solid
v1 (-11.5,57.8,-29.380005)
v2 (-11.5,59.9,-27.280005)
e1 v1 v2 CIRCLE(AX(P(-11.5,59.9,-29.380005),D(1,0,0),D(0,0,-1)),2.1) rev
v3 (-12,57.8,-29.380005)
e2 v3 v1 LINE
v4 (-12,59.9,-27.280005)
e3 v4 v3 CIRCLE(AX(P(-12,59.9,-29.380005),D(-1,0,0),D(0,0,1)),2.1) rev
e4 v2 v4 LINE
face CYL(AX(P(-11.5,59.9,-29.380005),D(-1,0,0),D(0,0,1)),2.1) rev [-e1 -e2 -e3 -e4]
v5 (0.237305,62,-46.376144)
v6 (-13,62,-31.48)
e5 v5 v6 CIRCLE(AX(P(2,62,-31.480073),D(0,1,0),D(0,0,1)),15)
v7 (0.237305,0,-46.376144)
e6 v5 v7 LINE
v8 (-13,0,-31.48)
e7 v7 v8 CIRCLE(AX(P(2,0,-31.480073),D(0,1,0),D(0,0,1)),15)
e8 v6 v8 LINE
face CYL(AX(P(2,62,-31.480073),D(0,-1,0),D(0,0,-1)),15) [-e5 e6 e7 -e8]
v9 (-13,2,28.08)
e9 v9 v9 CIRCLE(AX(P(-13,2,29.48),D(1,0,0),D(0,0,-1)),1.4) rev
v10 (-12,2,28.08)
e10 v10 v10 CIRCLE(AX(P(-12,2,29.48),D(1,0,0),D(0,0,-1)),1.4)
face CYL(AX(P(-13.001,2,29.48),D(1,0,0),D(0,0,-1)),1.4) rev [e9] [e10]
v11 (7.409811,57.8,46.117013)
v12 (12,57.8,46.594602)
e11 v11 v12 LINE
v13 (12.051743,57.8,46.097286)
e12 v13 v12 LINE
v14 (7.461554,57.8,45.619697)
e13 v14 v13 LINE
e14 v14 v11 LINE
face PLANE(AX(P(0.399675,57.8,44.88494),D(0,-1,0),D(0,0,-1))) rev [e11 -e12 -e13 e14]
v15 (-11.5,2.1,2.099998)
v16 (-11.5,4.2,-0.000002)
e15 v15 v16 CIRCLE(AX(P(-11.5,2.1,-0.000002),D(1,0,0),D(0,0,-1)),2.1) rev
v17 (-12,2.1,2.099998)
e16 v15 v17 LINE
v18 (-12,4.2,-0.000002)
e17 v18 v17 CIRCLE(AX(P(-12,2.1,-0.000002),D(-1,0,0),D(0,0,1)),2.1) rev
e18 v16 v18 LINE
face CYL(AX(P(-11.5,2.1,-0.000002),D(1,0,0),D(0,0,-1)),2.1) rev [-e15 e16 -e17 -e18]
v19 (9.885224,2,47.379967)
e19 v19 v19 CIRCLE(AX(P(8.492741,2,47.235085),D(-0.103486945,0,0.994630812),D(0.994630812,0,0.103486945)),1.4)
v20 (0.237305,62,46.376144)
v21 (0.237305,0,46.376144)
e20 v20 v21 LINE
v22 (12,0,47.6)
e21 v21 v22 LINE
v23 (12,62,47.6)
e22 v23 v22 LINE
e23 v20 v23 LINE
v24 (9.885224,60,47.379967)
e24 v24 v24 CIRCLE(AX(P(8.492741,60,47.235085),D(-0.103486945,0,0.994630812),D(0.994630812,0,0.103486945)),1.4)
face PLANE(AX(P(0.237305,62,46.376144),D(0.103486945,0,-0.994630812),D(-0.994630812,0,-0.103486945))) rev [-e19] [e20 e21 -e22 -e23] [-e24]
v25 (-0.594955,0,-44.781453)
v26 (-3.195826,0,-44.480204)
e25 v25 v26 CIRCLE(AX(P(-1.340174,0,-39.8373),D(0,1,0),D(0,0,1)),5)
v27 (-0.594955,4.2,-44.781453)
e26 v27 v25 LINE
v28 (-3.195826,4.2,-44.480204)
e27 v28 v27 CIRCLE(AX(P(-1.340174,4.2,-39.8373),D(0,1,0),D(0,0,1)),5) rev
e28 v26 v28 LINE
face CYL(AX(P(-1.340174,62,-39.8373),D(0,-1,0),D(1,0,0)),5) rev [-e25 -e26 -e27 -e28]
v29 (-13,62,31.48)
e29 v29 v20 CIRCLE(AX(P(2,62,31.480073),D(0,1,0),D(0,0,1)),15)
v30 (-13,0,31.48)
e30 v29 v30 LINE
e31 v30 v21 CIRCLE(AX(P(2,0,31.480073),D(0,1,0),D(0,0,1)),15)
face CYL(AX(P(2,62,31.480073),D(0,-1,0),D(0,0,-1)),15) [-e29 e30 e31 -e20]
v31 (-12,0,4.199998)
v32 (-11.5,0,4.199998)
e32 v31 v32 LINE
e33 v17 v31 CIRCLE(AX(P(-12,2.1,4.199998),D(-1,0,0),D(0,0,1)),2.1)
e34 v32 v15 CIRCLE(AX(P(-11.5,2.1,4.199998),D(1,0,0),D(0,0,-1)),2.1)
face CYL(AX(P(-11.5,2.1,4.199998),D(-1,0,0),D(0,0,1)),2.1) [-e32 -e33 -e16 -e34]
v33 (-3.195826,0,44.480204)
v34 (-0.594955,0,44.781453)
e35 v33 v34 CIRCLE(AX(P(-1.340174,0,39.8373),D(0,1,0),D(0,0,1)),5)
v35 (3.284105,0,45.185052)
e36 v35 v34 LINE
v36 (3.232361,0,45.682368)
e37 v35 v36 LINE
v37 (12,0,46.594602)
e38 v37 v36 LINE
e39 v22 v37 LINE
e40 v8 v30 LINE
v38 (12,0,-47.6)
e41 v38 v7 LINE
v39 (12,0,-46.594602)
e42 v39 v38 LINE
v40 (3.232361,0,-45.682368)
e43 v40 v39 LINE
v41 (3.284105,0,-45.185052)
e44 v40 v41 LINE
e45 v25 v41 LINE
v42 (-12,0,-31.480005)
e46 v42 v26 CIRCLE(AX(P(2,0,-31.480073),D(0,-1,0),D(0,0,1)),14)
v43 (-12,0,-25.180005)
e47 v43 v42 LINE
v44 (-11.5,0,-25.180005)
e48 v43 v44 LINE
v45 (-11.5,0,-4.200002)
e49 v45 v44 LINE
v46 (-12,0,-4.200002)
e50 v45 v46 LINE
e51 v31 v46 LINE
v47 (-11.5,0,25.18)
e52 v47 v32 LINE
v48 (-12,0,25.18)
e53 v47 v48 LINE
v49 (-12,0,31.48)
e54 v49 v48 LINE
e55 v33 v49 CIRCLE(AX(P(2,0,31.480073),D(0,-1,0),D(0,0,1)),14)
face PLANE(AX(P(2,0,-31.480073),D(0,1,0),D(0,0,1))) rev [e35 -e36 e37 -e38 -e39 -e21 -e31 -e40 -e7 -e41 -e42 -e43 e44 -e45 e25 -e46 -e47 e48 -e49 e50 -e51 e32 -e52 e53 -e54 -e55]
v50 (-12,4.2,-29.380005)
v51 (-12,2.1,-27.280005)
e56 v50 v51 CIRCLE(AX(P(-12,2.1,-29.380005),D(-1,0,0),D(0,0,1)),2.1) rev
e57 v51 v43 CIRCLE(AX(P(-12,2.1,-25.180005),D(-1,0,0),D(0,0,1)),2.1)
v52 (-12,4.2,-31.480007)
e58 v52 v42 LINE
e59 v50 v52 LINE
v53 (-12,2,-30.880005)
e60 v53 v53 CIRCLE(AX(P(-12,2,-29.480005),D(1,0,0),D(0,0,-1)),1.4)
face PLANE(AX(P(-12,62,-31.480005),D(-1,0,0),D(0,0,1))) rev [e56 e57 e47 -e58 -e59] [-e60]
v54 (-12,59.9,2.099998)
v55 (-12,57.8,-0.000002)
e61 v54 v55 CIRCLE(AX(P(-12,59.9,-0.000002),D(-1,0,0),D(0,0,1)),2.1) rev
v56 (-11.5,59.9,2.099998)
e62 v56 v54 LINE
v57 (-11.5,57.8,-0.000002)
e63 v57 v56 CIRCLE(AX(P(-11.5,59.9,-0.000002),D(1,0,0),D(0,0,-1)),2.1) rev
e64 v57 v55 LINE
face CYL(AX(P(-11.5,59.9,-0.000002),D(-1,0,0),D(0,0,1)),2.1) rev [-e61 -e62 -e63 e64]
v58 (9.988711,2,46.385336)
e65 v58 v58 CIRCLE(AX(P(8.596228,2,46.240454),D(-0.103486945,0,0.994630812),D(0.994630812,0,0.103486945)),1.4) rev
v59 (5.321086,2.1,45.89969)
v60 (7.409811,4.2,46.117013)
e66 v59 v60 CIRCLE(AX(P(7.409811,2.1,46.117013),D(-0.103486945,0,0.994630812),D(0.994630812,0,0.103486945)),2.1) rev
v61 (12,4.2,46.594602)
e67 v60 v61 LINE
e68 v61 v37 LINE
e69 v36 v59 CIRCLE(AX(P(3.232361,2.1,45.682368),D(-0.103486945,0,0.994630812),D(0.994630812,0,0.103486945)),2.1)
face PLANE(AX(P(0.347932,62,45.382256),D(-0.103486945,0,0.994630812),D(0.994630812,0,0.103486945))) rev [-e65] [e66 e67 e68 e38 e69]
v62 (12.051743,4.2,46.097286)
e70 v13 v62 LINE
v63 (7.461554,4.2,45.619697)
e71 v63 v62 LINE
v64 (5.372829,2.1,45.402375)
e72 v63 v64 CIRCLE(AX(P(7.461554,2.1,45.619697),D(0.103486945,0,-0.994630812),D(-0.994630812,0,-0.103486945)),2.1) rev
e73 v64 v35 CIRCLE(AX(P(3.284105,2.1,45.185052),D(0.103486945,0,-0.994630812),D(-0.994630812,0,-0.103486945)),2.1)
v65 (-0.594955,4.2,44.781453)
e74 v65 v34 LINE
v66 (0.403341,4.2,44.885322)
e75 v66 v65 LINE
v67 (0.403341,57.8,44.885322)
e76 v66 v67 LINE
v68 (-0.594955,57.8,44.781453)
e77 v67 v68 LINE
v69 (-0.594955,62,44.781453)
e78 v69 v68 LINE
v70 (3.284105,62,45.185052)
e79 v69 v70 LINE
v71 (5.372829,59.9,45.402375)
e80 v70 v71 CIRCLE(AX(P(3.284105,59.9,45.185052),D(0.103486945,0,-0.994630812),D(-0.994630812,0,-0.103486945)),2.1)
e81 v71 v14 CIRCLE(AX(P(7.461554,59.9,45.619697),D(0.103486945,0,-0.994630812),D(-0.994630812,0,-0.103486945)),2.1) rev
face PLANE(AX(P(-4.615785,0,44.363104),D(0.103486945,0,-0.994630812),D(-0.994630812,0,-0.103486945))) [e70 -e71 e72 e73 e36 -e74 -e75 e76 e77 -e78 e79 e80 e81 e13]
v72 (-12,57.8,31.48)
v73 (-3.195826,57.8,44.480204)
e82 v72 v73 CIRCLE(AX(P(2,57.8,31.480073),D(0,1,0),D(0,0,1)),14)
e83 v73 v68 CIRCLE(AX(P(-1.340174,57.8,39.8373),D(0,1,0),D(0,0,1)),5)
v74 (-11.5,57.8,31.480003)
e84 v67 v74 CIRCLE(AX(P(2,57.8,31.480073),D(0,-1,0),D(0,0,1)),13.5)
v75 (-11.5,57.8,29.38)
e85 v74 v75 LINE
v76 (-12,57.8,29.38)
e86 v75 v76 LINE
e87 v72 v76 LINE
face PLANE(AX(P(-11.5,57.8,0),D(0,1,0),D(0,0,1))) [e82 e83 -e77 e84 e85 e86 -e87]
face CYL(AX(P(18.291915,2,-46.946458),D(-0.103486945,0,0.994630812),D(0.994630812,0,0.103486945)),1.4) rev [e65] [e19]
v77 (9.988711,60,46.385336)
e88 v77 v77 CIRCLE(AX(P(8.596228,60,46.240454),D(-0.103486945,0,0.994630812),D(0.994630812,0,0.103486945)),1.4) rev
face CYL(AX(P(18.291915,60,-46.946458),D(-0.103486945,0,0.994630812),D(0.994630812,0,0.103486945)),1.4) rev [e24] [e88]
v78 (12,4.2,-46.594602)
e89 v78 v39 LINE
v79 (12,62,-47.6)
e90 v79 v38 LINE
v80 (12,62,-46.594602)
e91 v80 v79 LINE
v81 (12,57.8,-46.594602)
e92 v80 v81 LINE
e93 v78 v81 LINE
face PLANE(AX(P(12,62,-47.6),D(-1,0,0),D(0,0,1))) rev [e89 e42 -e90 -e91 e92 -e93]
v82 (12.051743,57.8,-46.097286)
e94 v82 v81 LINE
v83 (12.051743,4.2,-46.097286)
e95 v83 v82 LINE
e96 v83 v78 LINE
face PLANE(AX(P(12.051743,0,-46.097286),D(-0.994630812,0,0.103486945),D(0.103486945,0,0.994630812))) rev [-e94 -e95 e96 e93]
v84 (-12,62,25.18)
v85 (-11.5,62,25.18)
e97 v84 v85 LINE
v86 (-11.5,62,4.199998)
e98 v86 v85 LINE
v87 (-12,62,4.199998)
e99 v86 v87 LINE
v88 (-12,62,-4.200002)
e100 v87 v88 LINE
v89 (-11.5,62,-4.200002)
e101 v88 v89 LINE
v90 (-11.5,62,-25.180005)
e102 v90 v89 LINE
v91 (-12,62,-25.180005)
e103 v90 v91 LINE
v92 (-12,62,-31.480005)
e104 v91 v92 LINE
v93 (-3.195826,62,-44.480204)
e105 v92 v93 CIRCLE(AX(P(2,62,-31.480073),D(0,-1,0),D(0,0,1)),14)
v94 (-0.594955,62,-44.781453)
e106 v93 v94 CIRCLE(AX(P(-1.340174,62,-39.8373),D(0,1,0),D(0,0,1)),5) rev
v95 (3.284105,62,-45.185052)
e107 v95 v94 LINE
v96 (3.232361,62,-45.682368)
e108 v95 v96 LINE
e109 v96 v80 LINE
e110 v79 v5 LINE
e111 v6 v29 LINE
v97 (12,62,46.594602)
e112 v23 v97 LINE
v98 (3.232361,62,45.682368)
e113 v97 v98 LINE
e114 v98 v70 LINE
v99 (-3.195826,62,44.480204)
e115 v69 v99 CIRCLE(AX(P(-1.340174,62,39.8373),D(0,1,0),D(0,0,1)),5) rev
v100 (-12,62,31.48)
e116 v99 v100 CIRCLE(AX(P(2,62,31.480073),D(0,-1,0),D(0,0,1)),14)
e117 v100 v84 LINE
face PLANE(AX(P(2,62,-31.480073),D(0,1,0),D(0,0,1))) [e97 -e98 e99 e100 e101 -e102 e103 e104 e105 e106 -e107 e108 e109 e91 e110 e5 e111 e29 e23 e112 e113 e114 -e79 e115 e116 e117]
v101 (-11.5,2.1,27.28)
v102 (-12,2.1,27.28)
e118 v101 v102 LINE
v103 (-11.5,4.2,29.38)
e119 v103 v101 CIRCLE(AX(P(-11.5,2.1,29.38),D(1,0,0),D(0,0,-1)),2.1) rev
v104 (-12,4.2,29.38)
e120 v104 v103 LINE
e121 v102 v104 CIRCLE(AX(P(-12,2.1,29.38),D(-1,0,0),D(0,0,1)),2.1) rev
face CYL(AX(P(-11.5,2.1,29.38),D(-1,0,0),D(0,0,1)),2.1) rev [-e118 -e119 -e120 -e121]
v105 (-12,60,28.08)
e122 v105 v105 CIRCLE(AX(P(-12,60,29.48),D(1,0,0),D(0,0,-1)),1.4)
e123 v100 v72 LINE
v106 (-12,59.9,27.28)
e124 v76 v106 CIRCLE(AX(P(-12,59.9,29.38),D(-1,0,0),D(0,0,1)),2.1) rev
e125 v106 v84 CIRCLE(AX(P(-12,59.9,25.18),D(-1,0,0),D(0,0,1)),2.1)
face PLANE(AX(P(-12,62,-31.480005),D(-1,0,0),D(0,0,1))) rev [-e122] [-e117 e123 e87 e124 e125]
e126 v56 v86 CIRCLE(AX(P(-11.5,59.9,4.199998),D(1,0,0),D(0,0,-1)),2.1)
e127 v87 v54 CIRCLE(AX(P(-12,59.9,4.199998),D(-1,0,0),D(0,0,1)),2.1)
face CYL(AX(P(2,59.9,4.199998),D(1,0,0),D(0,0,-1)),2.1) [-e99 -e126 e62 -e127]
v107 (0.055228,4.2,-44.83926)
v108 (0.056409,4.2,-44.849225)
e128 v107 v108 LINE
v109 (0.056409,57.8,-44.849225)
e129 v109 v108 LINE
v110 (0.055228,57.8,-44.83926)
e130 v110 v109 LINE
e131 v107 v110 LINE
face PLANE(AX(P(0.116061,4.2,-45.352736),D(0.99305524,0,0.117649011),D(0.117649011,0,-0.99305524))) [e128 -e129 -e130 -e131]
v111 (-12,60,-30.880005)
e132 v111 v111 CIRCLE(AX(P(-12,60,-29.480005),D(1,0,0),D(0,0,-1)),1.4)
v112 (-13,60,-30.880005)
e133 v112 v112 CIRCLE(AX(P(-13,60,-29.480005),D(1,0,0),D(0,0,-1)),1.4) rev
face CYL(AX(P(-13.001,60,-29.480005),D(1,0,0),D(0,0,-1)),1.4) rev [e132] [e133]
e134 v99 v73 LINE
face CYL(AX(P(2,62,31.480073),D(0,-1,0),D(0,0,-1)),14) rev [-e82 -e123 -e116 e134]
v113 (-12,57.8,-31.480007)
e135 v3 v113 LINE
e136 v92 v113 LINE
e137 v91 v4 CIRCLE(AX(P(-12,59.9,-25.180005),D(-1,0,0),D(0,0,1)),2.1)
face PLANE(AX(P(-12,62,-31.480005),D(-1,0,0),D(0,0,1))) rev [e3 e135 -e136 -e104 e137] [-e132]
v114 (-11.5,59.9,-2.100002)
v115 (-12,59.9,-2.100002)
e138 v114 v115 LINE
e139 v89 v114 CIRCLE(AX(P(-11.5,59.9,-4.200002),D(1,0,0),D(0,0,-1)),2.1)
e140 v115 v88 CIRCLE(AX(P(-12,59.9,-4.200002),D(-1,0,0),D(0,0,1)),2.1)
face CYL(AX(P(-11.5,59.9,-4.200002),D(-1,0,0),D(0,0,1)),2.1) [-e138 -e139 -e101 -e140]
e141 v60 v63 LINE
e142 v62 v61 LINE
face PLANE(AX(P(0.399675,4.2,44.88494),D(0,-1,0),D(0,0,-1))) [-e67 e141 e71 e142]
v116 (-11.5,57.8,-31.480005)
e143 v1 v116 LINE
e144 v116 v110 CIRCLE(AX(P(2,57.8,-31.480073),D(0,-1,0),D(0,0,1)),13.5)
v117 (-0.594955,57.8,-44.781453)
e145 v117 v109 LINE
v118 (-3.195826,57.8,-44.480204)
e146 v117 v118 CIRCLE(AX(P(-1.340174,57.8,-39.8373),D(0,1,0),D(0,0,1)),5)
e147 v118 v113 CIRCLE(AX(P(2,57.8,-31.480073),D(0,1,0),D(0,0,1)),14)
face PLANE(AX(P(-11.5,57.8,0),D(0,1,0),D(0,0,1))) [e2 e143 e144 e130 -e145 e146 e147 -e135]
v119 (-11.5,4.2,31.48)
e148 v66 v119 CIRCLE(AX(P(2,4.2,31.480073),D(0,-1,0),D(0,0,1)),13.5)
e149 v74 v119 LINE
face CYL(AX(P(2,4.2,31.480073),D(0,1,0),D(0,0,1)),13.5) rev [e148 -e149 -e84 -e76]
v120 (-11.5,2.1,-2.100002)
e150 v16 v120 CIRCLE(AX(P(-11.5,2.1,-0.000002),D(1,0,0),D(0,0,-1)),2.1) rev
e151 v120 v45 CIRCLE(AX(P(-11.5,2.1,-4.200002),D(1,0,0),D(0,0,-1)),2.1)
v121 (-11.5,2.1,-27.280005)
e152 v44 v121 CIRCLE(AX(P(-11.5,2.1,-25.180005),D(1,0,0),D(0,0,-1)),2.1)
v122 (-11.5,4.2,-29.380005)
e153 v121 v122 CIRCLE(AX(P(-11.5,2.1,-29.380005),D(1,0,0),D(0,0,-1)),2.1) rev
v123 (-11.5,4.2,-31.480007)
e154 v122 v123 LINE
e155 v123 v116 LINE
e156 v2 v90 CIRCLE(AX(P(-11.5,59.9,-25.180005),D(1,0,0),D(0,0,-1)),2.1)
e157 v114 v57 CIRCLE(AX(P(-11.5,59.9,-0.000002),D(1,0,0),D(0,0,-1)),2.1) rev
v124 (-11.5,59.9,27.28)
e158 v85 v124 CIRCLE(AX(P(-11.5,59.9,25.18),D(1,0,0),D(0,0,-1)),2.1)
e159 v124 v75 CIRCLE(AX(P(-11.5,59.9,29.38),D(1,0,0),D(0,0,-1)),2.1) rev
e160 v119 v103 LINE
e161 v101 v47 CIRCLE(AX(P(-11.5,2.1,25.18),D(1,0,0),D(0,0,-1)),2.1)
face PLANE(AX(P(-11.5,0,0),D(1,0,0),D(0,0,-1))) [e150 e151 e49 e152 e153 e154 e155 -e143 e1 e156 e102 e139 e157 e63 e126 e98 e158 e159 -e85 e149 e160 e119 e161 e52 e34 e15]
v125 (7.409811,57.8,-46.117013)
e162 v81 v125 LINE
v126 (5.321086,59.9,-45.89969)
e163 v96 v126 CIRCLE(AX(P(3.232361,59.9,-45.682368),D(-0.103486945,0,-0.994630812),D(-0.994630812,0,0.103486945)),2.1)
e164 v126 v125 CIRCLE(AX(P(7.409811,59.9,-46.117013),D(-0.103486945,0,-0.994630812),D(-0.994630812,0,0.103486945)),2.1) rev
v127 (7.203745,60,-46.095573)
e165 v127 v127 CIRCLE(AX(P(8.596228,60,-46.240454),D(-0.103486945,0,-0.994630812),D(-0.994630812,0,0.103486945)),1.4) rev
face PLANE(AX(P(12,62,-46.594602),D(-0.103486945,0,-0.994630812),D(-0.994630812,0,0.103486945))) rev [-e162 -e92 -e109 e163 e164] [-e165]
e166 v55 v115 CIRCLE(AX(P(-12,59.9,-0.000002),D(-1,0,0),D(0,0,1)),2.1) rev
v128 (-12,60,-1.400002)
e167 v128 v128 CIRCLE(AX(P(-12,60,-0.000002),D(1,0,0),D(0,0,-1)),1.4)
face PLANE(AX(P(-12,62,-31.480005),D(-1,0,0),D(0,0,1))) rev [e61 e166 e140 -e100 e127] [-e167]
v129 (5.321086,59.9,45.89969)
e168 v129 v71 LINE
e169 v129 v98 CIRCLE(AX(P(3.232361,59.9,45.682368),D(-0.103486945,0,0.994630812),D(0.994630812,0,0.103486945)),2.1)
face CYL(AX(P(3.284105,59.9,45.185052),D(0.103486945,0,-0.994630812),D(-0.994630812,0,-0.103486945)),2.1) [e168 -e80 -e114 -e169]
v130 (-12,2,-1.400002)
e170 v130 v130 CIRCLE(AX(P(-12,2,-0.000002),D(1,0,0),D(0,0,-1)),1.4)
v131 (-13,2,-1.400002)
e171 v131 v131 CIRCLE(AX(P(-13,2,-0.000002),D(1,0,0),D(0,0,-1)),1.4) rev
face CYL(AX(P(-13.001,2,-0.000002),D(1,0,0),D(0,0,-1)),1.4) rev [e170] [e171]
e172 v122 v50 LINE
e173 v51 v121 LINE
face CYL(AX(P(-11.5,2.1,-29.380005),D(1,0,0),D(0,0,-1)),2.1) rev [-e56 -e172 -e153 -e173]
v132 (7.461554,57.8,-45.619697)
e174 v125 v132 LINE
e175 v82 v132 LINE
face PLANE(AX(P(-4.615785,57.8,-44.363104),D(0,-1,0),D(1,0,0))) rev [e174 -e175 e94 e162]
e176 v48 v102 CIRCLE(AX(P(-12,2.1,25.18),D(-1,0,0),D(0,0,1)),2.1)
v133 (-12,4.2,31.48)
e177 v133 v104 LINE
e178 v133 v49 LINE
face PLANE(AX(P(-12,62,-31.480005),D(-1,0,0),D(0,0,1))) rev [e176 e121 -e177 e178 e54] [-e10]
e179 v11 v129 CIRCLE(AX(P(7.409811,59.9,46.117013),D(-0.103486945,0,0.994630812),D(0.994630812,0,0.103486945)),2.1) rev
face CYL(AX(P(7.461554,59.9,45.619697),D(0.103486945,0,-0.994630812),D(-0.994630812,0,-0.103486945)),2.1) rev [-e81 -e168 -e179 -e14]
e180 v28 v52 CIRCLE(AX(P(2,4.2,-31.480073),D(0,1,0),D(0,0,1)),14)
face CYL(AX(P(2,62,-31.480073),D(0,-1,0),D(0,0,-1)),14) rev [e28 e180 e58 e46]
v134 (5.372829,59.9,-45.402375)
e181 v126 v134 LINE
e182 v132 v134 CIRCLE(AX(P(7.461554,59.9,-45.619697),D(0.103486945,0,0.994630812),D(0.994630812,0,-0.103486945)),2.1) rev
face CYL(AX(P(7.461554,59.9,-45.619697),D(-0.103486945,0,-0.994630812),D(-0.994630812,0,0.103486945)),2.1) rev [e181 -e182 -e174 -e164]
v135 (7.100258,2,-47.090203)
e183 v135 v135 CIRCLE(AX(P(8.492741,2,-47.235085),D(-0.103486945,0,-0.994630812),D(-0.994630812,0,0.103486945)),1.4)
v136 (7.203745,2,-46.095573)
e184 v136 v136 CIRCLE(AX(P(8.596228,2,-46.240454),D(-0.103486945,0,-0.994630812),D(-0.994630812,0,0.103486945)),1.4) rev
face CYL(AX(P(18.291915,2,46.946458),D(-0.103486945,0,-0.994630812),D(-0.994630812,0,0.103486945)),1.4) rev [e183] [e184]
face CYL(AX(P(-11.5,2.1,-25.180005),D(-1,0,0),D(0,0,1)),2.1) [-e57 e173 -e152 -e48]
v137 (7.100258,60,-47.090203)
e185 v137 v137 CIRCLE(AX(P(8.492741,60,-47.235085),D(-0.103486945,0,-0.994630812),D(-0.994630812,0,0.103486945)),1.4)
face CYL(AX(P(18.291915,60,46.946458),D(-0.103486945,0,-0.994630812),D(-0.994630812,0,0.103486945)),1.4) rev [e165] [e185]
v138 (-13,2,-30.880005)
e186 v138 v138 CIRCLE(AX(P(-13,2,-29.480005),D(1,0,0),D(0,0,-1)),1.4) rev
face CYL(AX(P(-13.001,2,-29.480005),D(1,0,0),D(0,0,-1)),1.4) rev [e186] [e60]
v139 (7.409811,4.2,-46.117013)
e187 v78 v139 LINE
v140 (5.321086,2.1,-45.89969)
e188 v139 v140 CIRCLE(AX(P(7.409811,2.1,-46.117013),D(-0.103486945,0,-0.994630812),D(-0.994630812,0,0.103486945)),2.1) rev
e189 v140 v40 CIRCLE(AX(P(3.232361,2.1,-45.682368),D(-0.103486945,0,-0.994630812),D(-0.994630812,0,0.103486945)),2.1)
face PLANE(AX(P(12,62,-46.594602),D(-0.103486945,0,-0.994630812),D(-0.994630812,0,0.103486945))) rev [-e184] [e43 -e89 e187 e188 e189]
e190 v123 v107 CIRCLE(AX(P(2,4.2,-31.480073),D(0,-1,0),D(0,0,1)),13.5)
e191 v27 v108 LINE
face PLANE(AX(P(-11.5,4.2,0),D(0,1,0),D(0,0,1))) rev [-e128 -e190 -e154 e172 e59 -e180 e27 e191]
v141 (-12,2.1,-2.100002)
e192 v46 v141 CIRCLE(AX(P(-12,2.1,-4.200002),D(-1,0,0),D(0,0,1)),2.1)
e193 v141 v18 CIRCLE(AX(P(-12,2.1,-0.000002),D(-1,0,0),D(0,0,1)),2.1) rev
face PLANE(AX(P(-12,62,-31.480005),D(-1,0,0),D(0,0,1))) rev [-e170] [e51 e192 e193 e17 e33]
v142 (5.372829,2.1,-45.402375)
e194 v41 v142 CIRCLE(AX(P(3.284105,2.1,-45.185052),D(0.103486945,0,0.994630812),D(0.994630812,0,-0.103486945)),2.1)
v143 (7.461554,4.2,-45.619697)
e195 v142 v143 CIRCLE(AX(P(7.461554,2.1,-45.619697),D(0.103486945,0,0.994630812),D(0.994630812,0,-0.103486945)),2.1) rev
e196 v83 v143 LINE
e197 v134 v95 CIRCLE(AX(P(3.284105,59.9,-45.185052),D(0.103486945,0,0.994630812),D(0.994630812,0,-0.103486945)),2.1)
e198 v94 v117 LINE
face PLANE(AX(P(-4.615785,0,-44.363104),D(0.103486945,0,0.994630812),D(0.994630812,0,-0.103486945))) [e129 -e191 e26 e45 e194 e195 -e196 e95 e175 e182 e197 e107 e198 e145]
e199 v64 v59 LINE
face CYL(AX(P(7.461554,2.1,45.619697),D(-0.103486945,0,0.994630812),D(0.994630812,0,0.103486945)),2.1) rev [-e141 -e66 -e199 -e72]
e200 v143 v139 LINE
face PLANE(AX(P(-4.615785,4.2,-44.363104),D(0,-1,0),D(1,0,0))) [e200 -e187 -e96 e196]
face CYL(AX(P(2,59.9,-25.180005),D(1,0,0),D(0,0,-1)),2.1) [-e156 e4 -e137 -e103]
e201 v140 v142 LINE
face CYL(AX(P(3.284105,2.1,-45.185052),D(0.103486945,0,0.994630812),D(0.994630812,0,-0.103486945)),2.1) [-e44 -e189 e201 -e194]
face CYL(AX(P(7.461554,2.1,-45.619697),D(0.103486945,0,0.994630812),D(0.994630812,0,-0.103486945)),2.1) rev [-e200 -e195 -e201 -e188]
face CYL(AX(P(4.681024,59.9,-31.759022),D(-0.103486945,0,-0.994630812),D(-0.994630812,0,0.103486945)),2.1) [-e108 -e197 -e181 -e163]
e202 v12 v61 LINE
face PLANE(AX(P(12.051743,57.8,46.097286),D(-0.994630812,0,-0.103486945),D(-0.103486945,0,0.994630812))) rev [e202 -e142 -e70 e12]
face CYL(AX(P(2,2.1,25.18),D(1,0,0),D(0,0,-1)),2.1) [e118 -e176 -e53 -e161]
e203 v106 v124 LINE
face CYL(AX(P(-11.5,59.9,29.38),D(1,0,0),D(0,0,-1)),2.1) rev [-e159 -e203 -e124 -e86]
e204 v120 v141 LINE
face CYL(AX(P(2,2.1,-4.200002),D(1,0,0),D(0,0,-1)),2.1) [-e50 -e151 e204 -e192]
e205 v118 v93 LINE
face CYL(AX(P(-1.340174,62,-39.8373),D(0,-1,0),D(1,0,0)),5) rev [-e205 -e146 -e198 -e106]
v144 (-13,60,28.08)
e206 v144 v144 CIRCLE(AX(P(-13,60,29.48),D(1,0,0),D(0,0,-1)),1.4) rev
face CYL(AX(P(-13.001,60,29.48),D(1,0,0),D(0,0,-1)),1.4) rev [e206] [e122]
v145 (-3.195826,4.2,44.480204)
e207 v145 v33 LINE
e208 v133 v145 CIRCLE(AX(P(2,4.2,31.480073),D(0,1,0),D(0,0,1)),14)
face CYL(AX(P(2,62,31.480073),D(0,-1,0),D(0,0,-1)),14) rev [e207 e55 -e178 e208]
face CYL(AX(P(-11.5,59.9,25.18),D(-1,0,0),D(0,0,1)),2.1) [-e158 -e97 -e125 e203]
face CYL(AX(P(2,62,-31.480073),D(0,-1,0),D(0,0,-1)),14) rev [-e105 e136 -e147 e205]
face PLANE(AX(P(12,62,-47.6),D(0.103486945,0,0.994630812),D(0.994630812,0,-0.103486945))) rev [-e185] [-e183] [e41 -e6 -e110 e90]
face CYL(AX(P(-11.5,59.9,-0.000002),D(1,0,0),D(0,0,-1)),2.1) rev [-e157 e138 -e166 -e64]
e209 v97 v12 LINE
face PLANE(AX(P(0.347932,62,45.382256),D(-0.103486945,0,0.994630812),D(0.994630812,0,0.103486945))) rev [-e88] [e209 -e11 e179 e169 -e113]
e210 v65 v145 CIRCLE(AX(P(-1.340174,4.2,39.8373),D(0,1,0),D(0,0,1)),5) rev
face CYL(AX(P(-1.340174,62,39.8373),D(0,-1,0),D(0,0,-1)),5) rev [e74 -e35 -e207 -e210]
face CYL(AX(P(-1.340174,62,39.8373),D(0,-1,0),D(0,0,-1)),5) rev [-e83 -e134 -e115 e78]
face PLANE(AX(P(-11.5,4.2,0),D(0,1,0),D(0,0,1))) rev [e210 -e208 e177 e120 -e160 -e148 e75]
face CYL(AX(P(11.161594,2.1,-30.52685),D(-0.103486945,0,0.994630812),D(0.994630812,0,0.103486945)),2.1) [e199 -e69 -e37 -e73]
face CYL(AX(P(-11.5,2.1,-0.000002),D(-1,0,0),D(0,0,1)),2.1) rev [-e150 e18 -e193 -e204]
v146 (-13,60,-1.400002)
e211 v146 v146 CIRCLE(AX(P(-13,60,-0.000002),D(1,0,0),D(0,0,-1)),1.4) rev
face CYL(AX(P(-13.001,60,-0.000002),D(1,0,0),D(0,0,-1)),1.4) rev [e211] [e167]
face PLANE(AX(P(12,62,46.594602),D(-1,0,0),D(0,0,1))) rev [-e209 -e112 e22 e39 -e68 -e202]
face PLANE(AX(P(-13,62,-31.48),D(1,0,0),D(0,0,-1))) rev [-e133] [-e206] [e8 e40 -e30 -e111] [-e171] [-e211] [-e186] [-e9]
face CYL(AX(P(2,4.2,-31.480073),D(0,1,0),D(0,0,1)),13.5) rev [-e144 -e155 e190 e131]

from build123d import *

# Parameters (mm, degrees)
EXTRUDE_1_DEPTH     = 62
CUT_EXTRUDE_1_REACH = 83.766
SKETCH_3_R          = 1.4
CUT_EXTRUDE_2_REACH = 115.398
SKETCH_4_R          = 1.4
CUT_EXTRUDE_3_REACH = 115.398
SKETCH_5_R          = 1.4
SKETCH_6_W          = 25.180002444
SKETCH_6_H          = 4.2
SKETCH_6_H_2        = 53.6
SKETCH_6_W_2        = 25.180002445
SKETCH_6_W_3        = 4.2
EXTRUDE_2_DEPTH     = 0.5
EXTRUDE_START       = -53.6
EXTRUDE_8_DEPTH     = 53.6
SKETCH_8_W          = 6
SKETCH_8_H          = 62
SKETCH_8_W_2        = 11.714967937
SKETCH_8_H_2        = 53.6
EXTRUDE_9_DEPTH     = 0.5
EXTRUDE_10_DEPTH    = 0.5
FILLET_START        = -45.102583308
FILLET_1_DEPTH      = 0.5
FILLET_START_2      = -12.000000001
FILLET_1_2_DEPTH    = 0.5
FILLET_1_3_DEPTH    = 0.5
FILLET_1_4_DEPTH    = 1.102583308
FILLET_1_5_DEPTH    = 12.05640865
FILLET_1_6_DEPTH    = 1.102583308
FILLET_2_R          = 5


with BuildPart() as part:
    # 스케치1 → 보스-돌출1 (new body)
    with BuildSketch(Plane(origin=(0, 0, 0), x_dir=(1, 0, 0), z_dir=(0, 1, 0))):
        with BuildLine():
            Line((12, 47.6), (0.237305416, 46.376143554))
            ThreePointArc((0.237305416, 46.376143554), (-9.212526729, 41.443970389), (-13.000000001, 31.48))
            Line((-13.000000001, 31.48), (-13.000000001, -31.48))
            ThreePointArc((-13.000000001, -31.48), (-9.212526729, -41.443970389), (0.237305416, -46.376143554))
            Line((0.237305416, -46.376143554), (12, -47.6))
            Line((12, -47.6), (12, -46.594601828))
            Line((12, -46.594601828), (0.347931928, -45.382255583))
            ThreePointArc((0.347931928, -45.382255583), (-8.467329474, -40.777116618), (-12.000000001, -31.48))
            Line((-12.000000001, -31.48), (-12.000000001, 31.480004889))
            ThreePointArc((-12.000000001, 31.480004889), (-8.46732785, 40.777118446), (0.347931928, 45.382255583))
            Line((0.347931928, 45.382255583), (12, 46.594601828))
            Line((12, 46.594601828), (12, 47.6))
        make_face()
    extrude(amount=EXTRUDE_1_DEPTH)

    # 스케치3 → 컷-돌출1 (cut, up to next)
    with BuildSketch(Plane(origin=(-12.000000001, 0, 0), x_dir=(0, 0, -1), z_dir=(1, 0, 0)), mode=Mode.PRIVATE) as cut_extrude_1_sk1:
        with Locations((-29.48, 60)):
            Circle(SKETCH_3_R)
    cut_extrude_1_tool1 = extrude(cut_extrude_1_sk1.sketch, amount=-CUT_EXTRUDE_1_REACH, mode=Mode.PRIVATE) & part.part
    # 스케치3 → 컷-돌출1 (cut, up to next)
    with BuildSketch(Plane(origin=(-12.000000001, 0, 0), x_dir=(0, 0, -1), z_dir=(1, 0, 0)), mode=Mode.PRIVATE) as cut_extrude_1_sk2:
        with Locations((29.480004889, 60)):
            Circle(SKETCH_3_R)
    cut_extrude_1_tool2 = extrude(cut_extrude_1_sk2.sketch, amount=-CUT_EXTRUDE_1_REACH, mode=Mode.PRIVATE) & part.part
    # 스케치3 → 컷-돌출1 (cut, up to next)
    with BuildSketch(Plane(origin=(-12.000000001, 0, 0), x_dir=(0, 0, -1), z_dir=(1, 0, 0)), mode=Mode.PRIVATE) as cut_extrude_1_sk3:
        with Locations((-29.48, 2)):
            Circle(SKETCH_3_R)
    cut_extrude_1_tool3 = extrude(cut_extrude_1_sk3.sketch, amount=-CUT_EXTRUDE_1_REACH, mode=Mode.PRIVATE) & part.part
    # 스케치3 → 컷-돌출1 (cut, up to next)
    with BuildSketch(Plane(origin=(-12.000000001, 0, 0), x_dir=(0, 0, -1), z_dir=(1, 0, 0)), mode=Mode.PRIVATE) as cut_extrude_1_sk4:
        with Locations((29.480004889, 2)):
            Circle(SKETCH_3_R)
    cut_extrude_1_tool4 = extrude(cut_extrude_1_sk4.sketch, amount=-CUT_EXTRUDE_1_REACH, mode=Mode.PRIVATE) & part.part
    # 스케치3 → 컷-돌출1 (cut, up to next)
    with BuildSketch(Plane(origin=(-12.000000001, 0, 0), x_dir=(0, 0, -1), z_dir=(1, 0, 0)), mode=Mode.PRIVATE) as cut_extrude_1_sk5:
        with Locations((2.445e-06, 2)):
            Circle(SKETCH_3_R)
    cut_extrude_1_tool5 = extrude(cut_extrude_1_sk5.sketch, amount=-CUT_EXTRUDE_1_REACH, mode=Mode.PRIVATE) & part.part
    # 스케치3 → 컷-돌출1 (cut, up to next)
    with BuildSketch(Plane(origin=(-12.000000001, 0, 0), x_dir=(0, 0, -1), z_dir=(1, 0, 0)), mode=Mode.PRIVATE) as cut_extrude_1_sk6:
        with Locations((2.445e-06, 60)):
            Circle(SKETCH_3_R)
    cut_extrude_1_tool6 = extrude(cut_extrude_1_sk6.sketch, amount=-CUT_EXTRUDE_1_REACH, mode=Mode.PRIVATE) & part.part
    add(cut_extrude_1_tool1.solids().sort_by_distance((-12, 60, 29.48))[0], mode=Mode.SUBTRACT)
    add(cut_extrude_1_tool2.solids().sort_by_distance((-12, 60, -29.480005))[0], mode=Mode.SUBTRACT)
    add(cut_extrude_1_tool3.solids().sort_by_distance((-12, 2, 29.48))[0], mode=Mode.SUBTRACT)
    add(cut_extrude_1_tool4.solids().sort_by_distance((-12, 2, -29.480005))[0], mode=Mode.SUBTRACT)
    add(cut_extrude_1_tool5.solids().sort_by_distance((-12, 2, -2e-06))[0], mode=Mode.SUBTRACT)
    add(cut_extrude_1_tool6.solids().sort_by_distance((-12, 60, -2e-06))[0], mode=Mode.SUBTRACT)

    # 스케치4 → 컷-돌출2 (cut, up to next)
    with BuildSketch(Plane(origin=(-4.771015515, 0, 45.85504987), x_dir=(0.9946308119914395, 0, 0.10348694525035429), z_dir=(-0.10348694525035429, 0, 0.9946308119914395)), mode=Mode.PRIVATE) as cut_extrude_2_sk1:
        with Locations((13.335356707, 60)):
            Circle(SKETCH_4_R)
    cut_extrude_2_tool1 = extrude(cut_extrude_2_sk1.sketch, amount=-CUT_EXTRUDE_2_REACH, mode=Mode.PRIVATE) & part.part
    # 스케치4 → 컷-돌출2 (cut, up to next)
    with BuildSketch(Plane(origin=(-4.771015515, 0, 45.85504987), x_dir=(0.9946308119914395, 0, 0.10348694525035429), z_dir=(-0.10348694525035429, 0, 0.9946308119914395)), mode=Mode.PRIVATE) as cut_extrude_2_sk2:
        with Locations((13.335356707, 2)):
            Circle(SKETCH_4_R)
    cut_extrude_2_tool2 = extrude(cut_extrude_2_sk2.sketch, amount=-CUT_EXTRUDE_2_REACH, mode=Mode.PRIVATE) & part.part
    add(cut_extrude_2_tool1.solids().sort_by_distance((8.492741, 60, 47.235085))[0], mode=Mode.SUBTRACT)
    add(cut_extrude_2_tool2.solids().sort_by_distance((8.492741, 2, 47.235085))[0], mode=Mode.SUBTRACT)

    # 스케치5 → 컷-돌출3 (cut, up to next)
    with BuildSketch(Plane(origin=(-4.771015515, 0, -45.85504987), x_dir=(-0.9946308119914237, 0, 0.10348694525050525), z_dir=(-0.10348694525050527, 0, -0.9946308119914238)), mode=Mode.PRIVATE) as cut_extrude_3_sk1:
        with Locations((-13.335356707, 60)):
            Circle(SKETCH_5_R)
    cut_extrude_3_tool1 = extrude(cut_extrude_3_sk1.sketch, amount=-CUT_EXTRUDE_3_REACH, mode=Mode.PRIVATE) & part.part
    # 스케치5 → 컷-돌출3 (cut, up to next)
    with BuildSketch(Plane(origin=(-4.771015515, 0, -45.85504987), x_dir=(-0.9946308119914237, 0, 0.10348694525050525), z_dir=(-0.10348694525050527, 0, -0.9946308119914238)), mode=Mode.PRIVATE) as cut_extrude_3_sk2:
        with Locations((-13.335356707, 2)):
            Circle(SKETCH_5_R)
    cut_extrude_3_tool2 = extrude(cut_extrude_3_sk2.sketch, amount=-CUT_EXTRUDE_3_REACH, mode=Mode.PRIVATE) & part.part
    add(cut_extrude_3_tool1.solids().sort_by_distance((8.492741, 60, -47.235085))[0], mode=Mode.SUBTRACT)
    add(cut_extrude_3_tool2.solids().sort_by_distance((8.492741, 2, -47.235085))[0], mode=Mode.SUBTRACT)

    # 스케치6 → 보스-돌출2 (add)
    with BuildSketch(Plane(origin=(-12.000000001, 0, 0), x_dir=(0, 0, -1), z_dir=(1, 0, 0))):
        with Locations((14.690003667, 59.9)):
            Rectangle(SKETCH_6_W, SKETCH_6_H)
        with Locations((14.690003667, 31)):
            Rectangle(SKETCH_6_W, SKETCH_6_H_2)
        with Locations((14.690003667, 2.1)):
            Rectangle(SKETCH_6_W, SKETCH_6_H)
        with Locations((-14.689998778, 59.9)):
            Rectangle(SKETCH_6_W_2, SKETCH_6_H)
        with Locations((-14.689998778, 2.1)):
            Rectangle(SKETCH_6_W_2, SKETCH_6_H)
        with Locations((-29.38, 31)):
            Rectangle(SKETCH_6_W_3, SKETCH_6_H_2)
        with Locations((29.380004889, 31)):
            Rectangle(SKETCH_6_W_3, SKETCH_6_H_2)
        with Locations((-14.689998778, 31)):
            Rectangle(SKETCH_6_W_2, SKETCH_6_H_2)
        with Locations((2.445e-06, 31)):
            Rectangle(SKETCH_6_W_3, SKETCH_6_H_2)
    extrude(amount=EXTRUDE_2_DEPTH)

    # 보스-돌출8: read off the stored shape, not the designer's step
    # 보스-돌출8 outline → 보스-돌출8 (add)
    with BuildSketch(Plane(origin=(0, 57.8, 0), x_dir=(1, 0, 0), z_dir=(0, 1, 0)).offset(EXTRUDE_START)):
        with BuildLine():
            ThreePointArc((-11.500000001, 31.480004889), (-8.210419566, 40.311683176), (0.055228076, 44.839259774))
            Line((0.055228076, 44.839259774), (0.116060525, 45.352736101))
            ThreePointArc((0.116060525, 45.352736101), (-8.544574488, 40.689413647), (-12.000000001, 31.480004889))
            Line((-12.000000001, 31.480004889), (-11.500000001, 31.480004889))
        make_face()
        with BuildLine():
            ThreePointArc((0.406934359, -44.885749074), (-8.093497148, -40.445078379), (-11.500000001, -31.48))
            Line((-11.500000001, -31.48), (-12.000000001, -31.48))
            ThreePointArc((-12.000000001, -31.48), (-8.467329474, -40.777116618), (0.347931928, -45.382255583))
            Line((0.347931928, -45.382255583), (0.406934359, -44.885749074))
        make_face()
    extrude(amount=EXTRUDE_8_DEPTH)

    # 스케치8 → 보스-돌출9 (add)
    with BuildSketch(Plane(origin=(-4.667528569, 0, 44.860419058), x_dir=(-0.9946308119914395, 0, -0.10348694525035321), z_dir=(0.10348694525035321, 0, -0.9946308119914395))):
        with Locations((-7.042534815, 31)):
            Rectangle(SKETCH_8_W, SKETCH_8_H)
        with Locations((-10.900018784, 31)):
            Rectangle(SKETCH_8_W_2, SKETCH_8_H_2)
    extrude(amount=EXTRUDE_9_DEPTH)

    # 스케치9 → 보스-돌출10 (add)
    with BuildSketch(Plane(origin=(-4.667528569, 0, -44.860419058), x_dir=(0.9946308119914264, 0, -0.10348694525048052), z_dir=(0.10348694525048052, 0, 0.9946308119914264))):
        Polygon((16.757502752, 4.2), (16.757502752, 57.8), (10.042534815, 57.8), (10.042534815, 62), (4.042534815, 62), (4.042534815, 0), (10.042534815, 0), (10.042534815, 4.2), align=None)
    extrude(amount=EXTRUDE_10_DEPTH)

    # 필렛1: read off the stored shape, not the designer's step
    # 필렛1 outline → 필렛1 (add)
    with BuildSketch(Plane(origin=(0, 0, 0), x_dir=(0.9946308119914397, 0, 0.10348694525035299), z_dir=(0.10348694525035297, 0, -0.9946308119914397)).offset(FILLET_START)):
        with BuildLine():
            ThreePointArc((10.042534815, -59.9), (10.657610575, -58.415075759), (12.142534815, -57.8))
            Line((12.142534815, -57.8), (10.042534815, -57.8))
            Line((10.042534815, -57.8), (10.042534815, -59.9))
        make_face()
        with BuildLine():
            Line((10.042534815, -4.2), (12.142534815, -4.2))
            ThreePointArc((12.142534815, -4.2), (10.657610574, -3.58492424), (10.042534815, -2.1))
            Line((10.042534815, -2.1), (10.042534815, -4.2))
        make_face()
    extrude(amount=FILLET_1_DEPTH)

    # Fillet 1 2 outline → Fillet 1 2 (add)
    with BuildSketch(Plane.YZ.offset(FILLET_START_2)):
        with BuildLine():
            Line((4.2, 27.28), (4.2, 29.38))
            ThreePointArc((4.2, 29.38), (3.58492424, 27.89507576), (2.1, 27.28))
            Line((2.1, 27.28), (4.2, 27.28))
        make_face()
        with BuildLine():
            Line((4.2, -27.280004889), (2.1, -27.280004889))
            ThreePointArc((2.1, -27.280004889), (3.58492424, -27.895080649), (4.2, -29.380004889))
            Line((4.2, -29.380004889), (4.2, -27.280004889))
        make_face()
        with BuildLine():
            Line((4.2, 2.099997555), (2.1, 2.099997555))
            ThreePointArc((2.1, 2.099997555), (3.584924241, 1.484921796), (4.2, -2.445e-06))
            Line((4.2, -2.445e-06), (4.2, 2.099997555))
        make_face()
        with BuildLine():
            Line((4.2, -2.100002445), (4.2, -2.445e-06))
            ThreePointArc((4.2, -2.445e-06), (3.58492424, -1.484926685), (2.1, -2.100002445))
            Line((2.1, -2.100002445), (4.2, -2.100002445))
        make_face()
        with BuildLine():
            Line((57.8, -27.280004889), (57.8, -29.380004889))
            ThreePointArc((57.8, -29.380004889), (58.41507576, -27.895080649), (59.9, -27.280004889))
            Line((59.9, -27.280004889), (57.8, -27.280004889))
        make_face()
        with BuildLine():
            Line((57.8, 27.28), (59.9, 27.28))
            ThreePointArc((59.9, 27.28), (58.41507576, 27.89507576), (57.8, 29.38))
            Line((57.8, 29.38), (57.8, 27.28))
        make_face()
        with BuildLine():
            Line((57.8, -2.100002445), (59.9, -2.100002445))
            ThreePointArc((59.9, -2.100002445), (58.41507576, -1.484926685), (57.8, -2.445e-06))
            Line((57.8, -2.445e-06), (57.8, -2.100002445))
        make_face()
        with BuildLine():
            Line((57.8, 2.099997555), (57.8, -2.445e-06))
            ThreePointArc((57.8, -2.445e-06), (58.415075759, 1.484921795), (59.9, 2.099997555))
            Line((59.9, 2.099997555), (57.8, 2.099997555))
        make_face()
    extrude(amount=FILLET_1_2_DEPTH)

    # Fillet 1 3 outline → Fillet 1 3 (add)
    with BuildSketch(Plane(origin=(0, 0, 0), x_dir=(0.9946308119914263, 0, -0.10348694525048104), z_dir=(0.10348694525048102, 0, 0.9946308119914263)).offset(FILLET_START)):
        with BuildLine():
            ThreePointArc((10.042534815, 2.1), (10.657610574, 3.58492424), (12.142534815, 4.2))
            Line((12.142534815, 4.2), (10.042534815, 4.2))
            Line((10.042534815, 4.2), (10.042534815, 2.1))
        make_face()
        with BuildLine():
            ThreePointArc((12.142534815, 57.8), (10.657610575, 58.415075759), (10.042534815, 59.9))
            Line((10.042534815, 59.9), (10.042534815, 57.8))
            Line((10.042534815, 57.8), (12.142534815, 57.8))
        make_face()
    extrude(amount=FILLET_1_3_DEPTH)

    # Fillet 1 4 outline → Fillet 1 4 (cut)
    with BuildSketch(Plane(origin=(0, 0, 0), x_dir=(0.9946308119914397, 0, 0.10348694525035299), z_dir=(0.10348694525035297, 0, -0.9946308119914397)).offset(FILLET_START)):
        with BuildLine():
            Line((10.042534815, -62), (10.042534815, -59.9))
            ThreePointArc((10.042534815, -59.9), (9.427459055, -61.38492424), (7.942534815, -62))
            Line((7.942534815, -62), (10.042534815, -62))
        make_face()
        with BuildLine():
            ThreePointArc((7.942534815, 0), (9.427459055, -0.61507576), (10.042534815, -2.1))
            Line((10.042534815, -2.1), (10.042534815, 0))
            Line((10.042534815, 0), (7.942534815, 0))
        make_face()
    extrude(amount=FILLET_1_4_DEPTH, mode=Mode.SUBTRACT)

    # Fillet 1 5 outline → Fillet 1 5 (cut)
    with BuildSketch(Plane.YZ.offset(FILLET_START_2)):
        with BuildLine():
            ThreePointArc((2.1, -27.280004889), (0.615075759, -26.664929129), (0, -25.180004889))
            Line((0, -25.180004889), (0, -27.280004889))
            Line((0, -27.280004889), (2.1, -27.280004889))
        make_face()
        with BuildLine():
            ThreePointArc((2.1, 2.099997555), (0.61507576, 2.715073315), (0, 4.199997555))
            Line((0, 4.199997555), (0, 2.099997555))
            Line((0, 2.099997555), (2.1, 2.099997555))
        make_face()
        with BuildLine():
            ThreePointArc((0, 25.18), (0.61507576, 26.66492424), (2.1, 27.28))
            Line((2.1, 27.28), (0, 27.28))
            Line((0, 27.28), (0, 25.18))
        make_face()
        with BuildLine():
            Line((2.1, -2.100002445), (0, -2.100002445))
            Line((0, -2.100002445), (0, -4.200002445))
            ThreePointArc((0, -4.200002445), (0.61507576, -2.715078205), (2.1, -2.100002445))
        make_face()
        with BuildLine():
            ThreePointArc((59.9, 27.28), (61.38492424, 26.66492424), (62, 25.18))
            Line((62, 25.18), (62, 27.28))
            Line((62, 27.28), (59.9, 27.28))
        make_face()
        with BuildLine():
            ThreePointArc((59.9, -2.100002445), (61.38492424, -2.715078205), (62, -4.200002445))
            Line((62, -4.200002445), (62, -2.100002445))
            Line((62, -2.100002445), (59.9, -2.100002445))
        make_face()
        with BuildLine():
            ThreePointArc((62, -25.180004889), (61.38492424, -26.664929129), (59.9, -27.280004889))
            Line((59.9, -27.280004889), (62, -27.280004889))
            Line((62, -27.280004889), (62, -25.180004889))
        make_face()
        with BuildLine():
            Line((59.9, 2.099997555), (62, 2.099997555))
            Line((62, 2.099997555), (62, 4.199997555))
            ThreePointArc((62, 4.199997555), (61.38492424, 2.715073315), (59.9, 2.099997555))
        make_face()
    extrude(amount=FILLET_1_5_DEPTH, mode=Mode.SUBTRACT)

    # Fillet 1 6 outline → Fillet 1 6 (cut)
    with BuildSketch(Plane(origin=(0, 0, 0), x_dir=(0.9946308119914263, 0, -0.10348694525048104), z_dir=(0.10348694525048102, 0, 0.9946308119914263)).offset(FILLET_START)):
        with BuildLine():
            Line((10.042534815, 0), (10.042534815, 2.1))
            ThreePointArc((10.042534815, 2.1), (9.427459055, 0.61507576), (7.942534815, 0))
            Line((7.942534815, 0), (10.042534815, 0))
        make_face()
        with BuildLine():
            Line((10.042534815, 62), (7.942534815, 62))
            ThreePointArc((7.942534815, 62), (9.427459055, 61.38492424), (10.042534815, 59.9))
            Line((10.042534815, 59.9), (10.042534815, 62))
        make_face()
    extrude(amount=FILLET_1_6_DEPTH, mode=Mode.SUBTRACT)

    # 필렛2
    # the kernel refuses this fillet: 5 mm, written as the material it adds along each edge
    with BuildSketch(Plane(origin=(-0.641481296, 10.854323903, -45.228621503), x_dir=(0.10348694525046676, 0, 0.9946308119914278), z_dir=(0, -1, 0))) as fillet_2_piece_1_section:
        with BuildLine():
            CenterArc((5.290068801, 1.252872343), FILLET_2_R, 164.15465064, 30.356858226)
            Line((0.480057883, 2.618081108), (0.383857665, 2.645385283))
            ThreePointArc((0.383857665, 2.645385283), (0.079307734, 1.338510795), (-0.099629203, 0.008603596))
            Line((-0.099629203, 0.008603596), (0, -0.1))
            ThreePointArc((0, -0.1), (0.224791081, -0.1), (0.35277243, -0.025057447))
            Line((0.35277243, -0.025057447), (0.449582163, 0))
        make_face()
    fillet_2_piece_1 = extrude(amount=10.854323903, mode=Mode.PRIVATE)
    fillet_2_piece_1 = split(fillet_2_piece_1, bisect_by=Plane(origin=(-0.594955411, 10.854323903, -44.781453231), z_dir=(-0.10348694525048052, 0, -0.9946308119914264)), keep=Keep.TOP, mode=Mode.PRIVATE)
    add(fillet_2_piece_1)
    with BuildSketch(Plane(origin=(-0.641481296, 62, -45.228621503), x_dir=(0.10348694525044558, 0, 0.99463081199143), z_dir=(0, -1, 0))) as fillet_2_piece_2_section:
        with BuildLine():
            CenterArc((5.290068801, 1.252872343), FILLET_2_R, 164.15465064, 30.356858226)
            Line((0.480057883, 2.618081108), (0.383857665, 2.645385283))
            ThreePointArc((0.383857665, 2.645385283), (0.079307734, 1.338510795), (-0.099629203, 0.008603596))
            Line((-0.099629203, 0.008603596), (0, -0.1))
            ThreePointArc((0, -0.1), (0.224791081, -0.1), (0.35277243, -0.025057447))
            Line((0.35277243, -0.025057447), (0.449582163, 0))
        make_face()
    fillet_2_piece_2 = extrude(amount=10.854323903, mode=Mode.PRIVATE)
    fillet_2_piece_2 = split(fillet_2_piece_2, bisect_by=Plane(origin=(-0.594955411, 62, -44.781453231), z_dir=(-0.10348694525048052, 0, -0.9946308119914264)), keep=Keep.TOP, mode=Mode.PRIVATE)
    add(fillet_2_piece_2)
    with BuildSketch(Plane(origin=(-0.641481296, 10.854323903, 45.228621503), x_dir=(-0.9596558761165634, 0, -0.2811771673428536), z_dir=(0, -1, 0))) as fillet_2_piece_3_section:
        with BuildLine():
            CenterArc((2.186420711, 4.977356879), FILLET_2_R, 245.098016839, 30.356858226)
            Line((0.081084669, 0.442209676), (0.038977948, 0.351506732))
            ThreePointArc((0.038977948, 0.351506732), (-0.057817812, 0.2391404), (-0.098360147, 0.018035562))
            Line((-0.098360147, 0.018035562), (-0.009506177, -0.099547138))
            ThreePointArc((-0.009506177, -0.099547138), (1.330864781, -0.16340074), (2.671235738, -0.099547138))
            Line((2.671235738, -0.099547138), (2.661729561, 0))
        make_face()
    fillet_2_piece_3 = extrude(amount=10.854323903, mode=Mode.PRIVATE)
    fillet_2_piece_3 = split(fillet_2_piece_3, bisect_by=Plane(origin=(-0.594955411, 10.854323903, 44.781453231), z_dir=(-0.10348694525035321, 0, 0.9946308119914395)), keep=Keep.TOP, mode=Mode.PRIVATE)
    add(fillet_2_piece_3)
    with BuildSketch(Plane(origin=(-0.641481296, 62, 45.228621503), x_dir=(0.10348694525036113, 0, -0.9946308119914388), z_dir=(0, -1, 0))) as fillet_2_piece_4_section:
        with BuildLine():
            CenterArc((5.290068801, -1.252872343), FILLET_2_R, 165.488491133, 30.356858226)
            Line((0.480057883, -2.618081108), (0.383857665, -2.645385283))
            ThreePointArc((0.383857665, -2.645385283), (0.079307734, -1.338510795), (-0.099629203, -0.008603596))
            Line((-0.099629203, -0.008603596), (0, 0.1))
            ThreePointArc((0, 0.1), (0.224791081, 0.1), (0.35277243, 0.025057447))
            Line((0.35277243, 0.025057447), (0.449582163, 0))
        make_face()
    fillet_2_piece_4 = extrude(amount=10.854323903, mode=Mode.PRIVATE)
    fillet_2_piece_4 = split(fillet_2_piece_4, bisect_by=Plane(origin=(-0.594955411, 62, 44.781453231), z_dir=(-0.10348694525035321, 0, 0.9946308119914395)), keep=Keep.TOP, mode=Mode.PRIVATE)
    add(fillet_2_piece_4)


solid = part.part
